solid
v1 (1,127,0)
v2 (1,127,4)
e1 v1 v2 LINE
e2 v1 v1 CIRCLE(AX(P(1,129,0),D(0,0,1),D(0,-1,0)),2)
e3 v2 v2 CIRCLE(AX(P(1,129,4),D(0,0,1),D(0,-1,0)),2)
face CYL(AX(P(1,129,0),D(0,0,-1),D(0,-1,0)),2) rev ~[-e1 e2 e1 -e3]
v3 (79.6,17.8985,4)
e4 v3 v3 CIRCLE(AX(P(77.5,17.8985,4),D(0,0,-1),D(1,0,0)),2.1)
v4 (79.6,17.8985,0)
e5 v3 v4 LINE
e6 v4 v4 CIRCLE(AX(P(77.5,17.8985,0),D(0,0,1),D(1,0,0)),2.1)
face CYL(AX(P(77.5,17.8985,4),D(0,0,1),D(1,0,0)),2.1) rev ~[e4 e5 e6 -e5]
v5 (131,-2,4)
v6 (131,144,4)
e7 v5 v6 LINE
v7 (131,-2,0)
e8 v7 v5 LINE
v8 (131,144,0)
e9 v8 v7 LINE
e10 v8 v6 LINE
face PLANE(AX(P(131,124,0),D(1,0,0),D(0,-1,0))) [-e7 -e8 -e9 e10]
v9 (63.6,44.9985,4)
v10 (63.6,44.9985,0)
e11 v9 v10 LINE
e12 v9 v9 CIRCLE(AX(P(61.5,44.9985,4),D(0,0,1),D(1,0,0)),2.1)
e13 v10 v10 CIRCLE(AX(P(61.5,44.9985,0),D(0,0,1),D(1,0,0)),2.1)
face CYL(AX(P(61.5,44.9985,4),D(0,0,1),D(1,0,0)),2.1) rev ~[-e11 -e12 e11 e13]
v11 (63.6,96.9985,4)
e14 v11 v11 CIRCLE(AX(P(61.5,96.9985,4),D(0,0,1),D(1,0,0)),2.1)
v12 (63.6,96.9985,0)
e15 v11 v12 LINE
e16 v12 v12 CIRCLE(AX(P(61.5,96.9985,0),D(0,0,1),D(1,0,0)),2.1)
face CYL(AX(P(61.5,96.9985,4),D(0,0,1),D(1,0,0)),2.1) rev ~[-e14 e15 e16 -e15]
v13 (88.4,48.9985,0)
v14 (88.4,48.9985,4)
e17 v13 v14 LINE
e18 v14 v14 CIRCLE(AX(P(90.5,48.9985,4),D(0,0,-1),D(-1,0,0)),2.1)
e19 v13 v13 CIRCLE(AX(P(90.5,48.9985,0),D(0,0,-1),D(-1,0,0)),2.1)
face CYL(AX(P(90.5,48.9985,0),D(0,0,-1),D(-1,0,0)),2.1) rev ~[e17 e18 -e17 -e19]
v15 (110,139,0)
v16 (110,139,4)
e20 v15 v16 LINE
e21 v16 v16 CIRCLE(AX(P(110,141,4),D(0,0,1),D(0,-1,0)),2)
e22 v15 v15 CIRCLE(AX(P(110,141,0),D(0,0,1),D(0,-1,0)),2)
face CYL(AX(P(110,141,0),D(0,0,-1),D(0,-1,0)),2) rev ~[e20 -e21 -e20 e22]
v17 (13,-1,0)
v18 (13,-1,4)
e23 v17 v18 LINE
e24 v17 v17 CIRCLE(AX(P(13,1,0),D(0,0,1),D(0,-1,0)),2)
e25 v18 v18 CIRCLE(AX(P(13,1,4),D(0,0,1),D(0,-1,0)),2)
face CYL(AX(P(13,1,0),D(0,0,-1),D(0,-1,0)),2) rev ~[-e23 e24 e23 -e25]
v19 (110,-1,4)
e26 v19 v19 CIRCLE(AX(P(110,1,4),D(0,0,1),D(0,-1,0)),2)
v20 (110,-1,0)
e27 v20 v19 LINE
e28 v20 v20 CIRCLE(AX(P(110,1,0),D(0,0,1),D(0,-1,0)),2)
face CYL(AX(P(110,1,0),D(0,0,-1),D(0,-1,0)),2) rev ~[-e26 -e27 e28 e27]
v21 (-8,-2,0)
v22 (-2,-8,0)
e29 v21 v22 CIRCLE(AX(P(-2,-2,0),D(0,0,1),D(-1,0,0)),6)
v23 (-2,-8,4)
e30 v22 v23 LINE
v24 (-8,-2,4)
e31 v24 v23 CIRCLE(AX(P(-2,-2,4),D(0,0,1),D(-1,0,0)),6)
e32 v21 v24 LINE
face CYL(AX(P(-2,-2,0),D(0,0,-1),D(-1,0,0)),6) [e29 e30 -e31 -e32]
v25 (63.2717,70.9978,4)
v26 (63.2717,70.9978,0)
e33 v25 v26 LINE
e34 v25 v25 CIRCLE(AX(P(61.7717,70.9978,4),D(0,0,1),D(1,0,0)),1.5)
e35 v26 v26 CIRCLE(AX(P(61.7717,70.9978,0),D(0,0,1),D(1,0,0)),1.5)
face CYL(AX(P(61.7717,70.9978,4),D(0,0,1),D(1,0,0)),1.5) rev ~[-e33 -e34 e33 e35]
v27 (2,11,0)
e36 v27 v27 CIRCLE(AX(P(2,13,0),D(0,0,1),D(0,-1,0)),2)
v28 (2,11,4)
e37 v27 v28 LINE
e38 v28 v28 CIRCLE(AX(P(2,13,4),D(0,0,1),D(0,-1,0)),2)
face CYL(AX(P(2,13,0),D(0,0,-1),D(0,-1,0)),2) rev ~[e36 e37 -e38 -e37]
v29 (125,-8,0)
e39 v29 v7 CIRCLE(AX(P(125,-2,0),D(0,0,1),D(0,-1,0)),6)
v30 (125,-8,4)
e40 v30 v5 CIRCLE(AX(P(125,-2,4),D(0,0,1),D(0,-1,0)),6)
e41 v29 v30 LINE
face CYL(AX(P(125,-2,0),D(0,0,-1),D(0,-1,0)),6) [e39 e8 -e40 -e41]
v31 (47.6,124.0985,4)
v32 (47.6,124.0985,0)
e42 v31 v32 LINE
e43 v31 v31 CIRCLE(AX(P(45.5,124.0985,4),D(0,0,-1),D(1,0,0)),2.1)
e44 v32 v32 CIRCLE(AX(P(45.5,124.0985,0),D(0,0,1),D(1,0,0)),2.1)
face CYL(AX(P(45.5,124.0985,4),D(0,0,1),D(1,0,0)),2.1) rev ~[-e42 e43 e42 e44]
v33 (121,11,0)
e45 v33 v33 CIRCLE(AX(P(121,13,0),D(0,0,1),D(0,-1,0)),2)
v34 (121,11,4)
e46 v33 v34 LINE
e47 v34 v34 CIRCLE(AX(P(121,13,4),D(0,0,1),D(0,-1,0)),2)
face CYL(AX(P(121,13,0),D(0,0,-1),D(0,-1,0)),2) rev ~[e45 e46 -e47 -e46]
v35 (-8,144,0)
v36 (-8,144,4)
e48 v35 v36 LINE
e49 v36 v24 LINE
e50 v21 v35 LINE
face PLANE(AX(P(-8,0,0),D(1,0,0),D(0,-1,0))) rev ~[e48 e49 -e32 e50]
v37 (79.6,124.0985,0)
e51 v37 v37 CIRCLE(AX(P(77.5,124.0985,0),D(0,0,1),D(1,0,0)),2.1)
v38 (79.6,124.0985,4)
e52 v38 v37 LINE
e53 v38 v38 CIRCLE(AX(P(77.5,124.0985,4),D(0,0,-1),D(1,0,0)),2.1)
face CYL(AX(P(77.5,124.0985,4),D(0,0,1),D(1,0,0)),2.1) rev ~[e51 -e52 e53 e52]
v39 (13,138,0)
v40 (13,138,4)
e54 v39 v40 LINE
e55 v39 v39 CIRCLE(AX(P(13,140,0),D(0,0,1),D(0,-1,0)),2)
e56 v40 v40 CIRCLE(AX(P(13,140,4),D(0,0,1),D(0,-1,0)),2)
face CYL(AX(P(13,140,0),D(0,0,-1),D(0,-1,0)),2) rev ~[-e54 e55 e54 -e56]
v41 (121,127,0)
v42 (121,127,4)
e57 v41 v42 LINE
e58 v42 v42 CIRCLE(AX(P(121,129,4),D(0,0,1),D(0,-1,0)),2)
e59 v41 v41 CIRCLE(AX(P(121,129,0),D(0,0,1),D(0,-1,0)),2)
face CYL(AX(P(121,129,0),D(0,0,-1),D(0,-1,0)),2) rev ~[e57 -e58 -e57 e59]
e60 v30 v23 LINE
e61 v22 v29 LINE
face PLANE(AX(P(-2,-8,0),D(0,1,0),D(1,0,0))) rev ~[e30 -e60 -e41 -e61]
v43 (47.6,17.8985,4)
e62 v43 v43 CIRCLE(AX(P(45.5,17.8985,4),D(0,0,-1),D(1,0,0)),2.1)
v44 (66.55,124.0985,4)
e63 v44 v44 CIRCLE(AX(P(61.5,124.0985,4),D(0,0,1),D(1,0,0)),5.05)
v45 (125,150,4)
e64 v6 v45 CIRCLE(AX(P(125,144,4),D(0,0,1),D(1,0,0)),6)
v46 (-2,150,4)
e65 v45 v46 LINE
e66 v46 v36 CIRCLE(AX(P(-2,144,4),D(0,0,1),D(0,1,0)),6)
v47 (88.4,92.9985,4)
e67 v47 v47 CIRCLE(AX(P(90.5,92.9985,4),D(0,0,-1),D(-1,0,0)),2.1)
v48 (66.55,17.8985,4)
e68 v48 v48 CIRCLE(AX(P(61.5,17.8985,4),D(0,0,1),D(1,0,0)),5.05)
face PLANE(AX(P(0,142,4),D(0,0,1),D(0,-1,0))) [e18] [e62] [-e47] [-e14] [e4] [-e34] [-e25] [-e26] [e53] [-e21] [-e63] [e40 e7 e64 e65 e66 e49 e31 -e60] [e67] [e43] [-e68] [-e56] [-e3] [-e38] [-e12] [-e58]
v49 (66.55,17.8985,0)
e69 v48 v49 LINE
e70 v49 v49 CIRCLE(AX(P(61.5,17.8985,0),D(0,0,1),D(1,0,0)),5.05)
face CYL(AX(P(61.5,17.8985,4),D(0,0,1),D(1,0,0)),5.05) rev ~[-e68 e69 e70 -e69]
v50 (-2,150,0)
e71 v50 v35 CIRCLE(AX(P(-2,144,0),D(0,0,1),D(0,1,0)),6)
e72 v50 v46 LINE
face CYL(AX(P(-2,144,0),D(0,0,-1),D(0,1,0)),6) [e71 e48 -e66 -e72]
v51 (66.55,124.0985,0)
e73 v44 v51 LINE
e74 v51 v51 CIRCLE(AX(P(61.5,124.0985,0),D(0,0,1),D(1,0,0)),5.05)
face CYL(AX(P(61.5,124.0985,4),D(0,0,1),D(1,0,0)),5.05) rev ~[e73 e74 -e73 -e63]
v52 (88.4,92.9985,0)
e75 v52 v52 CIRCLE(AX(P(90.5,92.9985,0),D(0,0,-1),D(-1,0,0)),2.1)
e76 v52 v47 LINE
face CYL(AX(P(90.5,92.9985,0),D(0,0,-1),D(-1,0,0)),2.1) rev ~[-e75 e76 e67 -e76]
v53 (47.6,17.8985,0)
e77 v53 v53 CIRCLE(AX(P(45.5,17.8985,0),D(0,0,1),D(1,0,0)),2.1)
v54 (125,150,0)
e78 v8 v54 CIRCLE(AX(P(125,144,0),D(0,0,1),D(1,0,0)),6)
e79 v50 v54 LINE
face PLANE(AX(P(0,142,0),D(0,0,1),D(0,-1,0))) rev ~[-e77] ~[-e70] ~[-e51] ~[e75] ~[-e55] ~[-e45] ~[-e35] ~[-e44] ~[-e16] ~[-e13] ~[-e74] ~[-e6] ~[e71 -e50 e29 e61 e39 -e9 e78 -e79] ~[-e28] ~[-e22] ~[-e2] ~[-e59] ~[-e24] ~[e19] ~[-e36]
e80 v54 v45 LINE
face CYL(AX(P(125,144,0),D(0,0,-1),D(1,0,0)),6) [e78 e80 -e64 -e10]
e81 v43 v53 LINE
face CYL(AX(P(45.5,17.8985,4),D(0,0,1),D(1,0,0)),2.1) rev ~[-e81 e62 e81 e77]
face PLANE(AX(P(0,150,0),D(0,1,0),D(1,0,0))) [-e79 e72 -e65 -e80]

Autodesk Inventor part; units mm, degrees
ref_plane "YZ Plane" through (0, 0, 0) normal (1, 0, 0) x (0, 1, 0)
ref_plane "XZ Plane" through (0, 0, 0) normal (0, 1, 0) x (-1, 0, 0)
ref_plane "XY Plane" through (0, 0, 0) normal (0, 0, 1) x (1, 0, 0)
ref_plane "Plano de trabalho1" through (0, 142, 0) normal (0, 0, 1) x (0, -1, 0)
sketch "Esboço1" plane through (0, 142, 0) normal (0, 0, 1) x (0, -1, 0)
  arc A0 (124, -4) -> (125, -5) centre (125, -4) ccw projected
  line L0 (142, -5) -> (125, -5) projected
  line L1 (142, -5) -> (142, -8) projected
  line L2 (142, -8) -> (144, -8) projected
  arc A1 (144, -8) -> (150, -2) centre (144, -2) ccw projected
  line L3 (150, -2) -> (150, 0) projected
  line L4 (150, 0) -> (147, 0) projected
  line L5 (147, 0) -> (147, 17) projected
  arc A2 (147, 17) -> (146, 18) centre (146, 17) ccw projected
  line L6 (135, 18) -> (146, 18) projected
  arc A3 (135, 18) -> (134, 17) centre (135, 17) ccw projected
  line L7 (134, 9) -> (134, 17) projected
  arc A4 (133, 8) -> (134, 9) centre (133, 9) ccw projected
  line L8 (133, 8) -> (124, 8) projected
  line L9 (124, -4) -> (124, 8) projected
  circle A5 centre (141, 13) radius 2 projected
  circle A6 centre (129, 2) radius 2 projected
  arc A7 (-4, 18) -> (-5, 17) centre (-4, 17) ccw projected
  line L10 (-5, 0) -> (-5, 17) projected
  line L11 (-5, 0) -> (-8, 0) projected
  line L12 (-8, 0) -> (-8, -2) projected
  arc A8 (-8, -2) -> (-2, -8) centre (-2, -2) ccw projected
  line L13 (-2, -8) -> (0, -8) projected
  line L14 (0, -8) -> (0, -5) projected
  line L15 (0, -5) -> (17, -5) projected
  arc A9 (17, -5) -> (18, -4) centre (17, -4) ccw projected
  line L16 (18, 7) -> (18, -4) projected
  arc A10 (18, 7) -> (17, 8) centre (17, 7) ccw projected
  line L17 (9, 8) -> (17, 8) projected
  arc A11 (8, 9) -> (9, 8) centre (9, 9) ccw projected
  line L18 (8, 9) -> (8, 18) projected
  line L19 (-4, 18) -> (8, 18) projected
  circle A12 centre (13, 1) radius 2 projected
  circle A13 centre (2, 13) radius 2 projected
  circle A14 centre (141, 110) radius 2 projected
  circle A15 centre (129, 121) radius 2 projected
  arc A16 (146, 105) -> (147, 106) centre (146, 106) ccw projected
  line L20 (147, 123) -> (147, 106) projected
  line L21 (150, 123) -> (147, 123) projected
  line L22 (150, 125) -> (150, 123) projected
  arc A17 (150, 125) -> (144, 131) centre (144, 125) ccw projected
  line L23 (144, 131) -> (124, 131) projected
  line L24 (124, 116) -> (124, 131) projected
  arc A18 (124, 116) -> (125, 115) centre (125, 116) ccw projected
  line L25 (133, 115) -> (125, 115) projected
  arc A19 (134, 114) -> (133, 115) centre (133, 114) ccw projected
  line L26 (134, 114) -> (134, 106) projected
  arc A20 (134, 106) -> (135, 105) centre (135, 106) ccw projected
  line L27 (146, 105) -> (135, 105) projected
  arc A21 (17, 115) -> (18, 116) centre (17, 116) ccw projected
  line L28 (18, 131) -> (18, 116) projected
  line L29 (-2, 131) -> (18, 131) projected
  arc A22 (-2, 131) -> (-8, 125) centre (-2, 125) ccw projected
  line L30 (-8, 125) -> (-8, 123) projected
  line L31 (-8, 123) -> (-5, 123) projected
  line L32 (-5, 123) -> (-5, 106) projected
  arc A23 (-5, 106) -> (-4, 105) centre (-4, 106) ccw projected
  line L33 (7, 105) -> (-4, 105) projected
  arc A24 (7, 105) -> (8, 106) centre (7, 106) ccw projected
  line L34 (8, 114) -> (8, 106) projected
  arc A25 (9, 115) -> (8, 114) centre (9, 114) ccw projected
  line L35 (9, 115) -> (17, 115) projected
  circle A26 centre (1, 110) radius 2 projected
  circle A27 centre (13, 121) radius 2 projected
  line L36 (18, 131) -> (124.2929, 131)
  line L37 (150, 123) -> (150, 0)
  line L38 (0, -8) -> (142, -8)
  line L39 (-8, 0) -> (-8, 123)
  point P0 (142, 0)
extrude "Extrusão1" add sketch "Esboço1" along normal blind 4
sketch "Esboço2" plane through (0, 142, 4) normal (0, 0, 1) x (1, 0, 0)
  circle A0 centre (61.5, -17.9015) radius 5 projected
  circle A1 centre (61.5, -124.1015) radius 5 projected
  circle A2 centre (61.7717, -71.0022) radius 5.8 projected
  circle A3 centre (61.5, -45.0015) radius 2.1 projected
  circle A4 centre (61.5, -97.0015) radius 2.1 projected
  circle A5 centre (61.5, -17.9015) radius 5.05
  circle A6 centre (61.5, -45.0015) radius 2.1
  circle A7 centre (61.5, -97.0015) radius 2.1
  circle A8 centre (61.7717, -71.0022) radius 1.5
  circle A9 centre (61.5, -124.1015) radius 5
  point P0 (0, -142)
  dimension "d2" = 10.1
  dimension "d3" = 4.2
  dimension "d4" = 3
  dimension "d19" = 10
extrude "Extrusão2" cut sketch "Esboço2" against normal blind 4 contours A0 | A1 | A3 | A4 | A8
sketch "Esboço3" plane through (0, 142, 4) normal (0, 0, 1) x (1, 0, 0)
  circle A0 centre (61.5, -124.1015) radius 5 projected
  circle A1 centre (61.5, -124.1015) radius 16
  circle A2 centre (61.5, -17.9015) radius 5 projected
  circle A3 centre (61.5, -17.9015) radius 16
  line L0 (45.5, -17.9015) -> (77.5, -17.9015)
  line L1 (45.5, -124.1015) -> (77.5, -124.1015)
  circle A4 centre (77.5, -124.1015) radius 2.1
  circle A5 centre (45.5, -124.1015) radius 2.1
  circle A6 centre (77.5, -17.9015) radius 2.1
  circle A7 centre (45.5, -17.9015) radius 2.1
  point P0 (0, -142)
  dimension "d7" = 32
  dimension "d8" = 32
  dimension "d9" = 4.2
  dimension "d10" = 4.2
  dimension "d11" = 4.2
  dimension "d12" = 4.2
extrude "Extrusão3" cut sketch "Esboço3" against normal blind 4 contours A4 A1 L1 | L1 A1 A4 | A5 A1 L1 | L1 A1 A5 | A1 A4 | A1 A5 | A6 A3 L0 | L0 A3 A6 | A7 A3 L0 | L0 A3 A7 | A3 A6 | A3 A7
sketch "Esboço4" plane through (0, 142, 0) normal (0, 0, -1) x (-1, 0, 0)
  circle A0 centre (-90.5, -93.0015) radius 2.1
  circle A1 centre (-90.5, -49.0015) radius 2.1
  point P0 (0, -142)
  dimension "d15" = 4.2
  dimension "d16" = 4.2
extrude "Extrusão4" cut sketch "Esboço4" against normal blind 4
sketch "Esboço5" plane through (0, 142, 4) normal (0, 0, 1) x (1, 0, 0)
  circle A0 centre (61.5, -124.1015) radius 5 projected
  circle A1 centre (61.5, -124.1015) radius 5.05
  circle A2 centre (61.5, -17.9015) radius 5 projected
  circle A3 centre (61.5, -17.9015) radius 5.05
  point P0 (0, -142)
  dimension "d20" = 10.1
  dimension "d21" = 10.1
extrude "Extrusão5" cut sketch "Esboço5" against normal blind 10
properties part number "fechamentocima"
